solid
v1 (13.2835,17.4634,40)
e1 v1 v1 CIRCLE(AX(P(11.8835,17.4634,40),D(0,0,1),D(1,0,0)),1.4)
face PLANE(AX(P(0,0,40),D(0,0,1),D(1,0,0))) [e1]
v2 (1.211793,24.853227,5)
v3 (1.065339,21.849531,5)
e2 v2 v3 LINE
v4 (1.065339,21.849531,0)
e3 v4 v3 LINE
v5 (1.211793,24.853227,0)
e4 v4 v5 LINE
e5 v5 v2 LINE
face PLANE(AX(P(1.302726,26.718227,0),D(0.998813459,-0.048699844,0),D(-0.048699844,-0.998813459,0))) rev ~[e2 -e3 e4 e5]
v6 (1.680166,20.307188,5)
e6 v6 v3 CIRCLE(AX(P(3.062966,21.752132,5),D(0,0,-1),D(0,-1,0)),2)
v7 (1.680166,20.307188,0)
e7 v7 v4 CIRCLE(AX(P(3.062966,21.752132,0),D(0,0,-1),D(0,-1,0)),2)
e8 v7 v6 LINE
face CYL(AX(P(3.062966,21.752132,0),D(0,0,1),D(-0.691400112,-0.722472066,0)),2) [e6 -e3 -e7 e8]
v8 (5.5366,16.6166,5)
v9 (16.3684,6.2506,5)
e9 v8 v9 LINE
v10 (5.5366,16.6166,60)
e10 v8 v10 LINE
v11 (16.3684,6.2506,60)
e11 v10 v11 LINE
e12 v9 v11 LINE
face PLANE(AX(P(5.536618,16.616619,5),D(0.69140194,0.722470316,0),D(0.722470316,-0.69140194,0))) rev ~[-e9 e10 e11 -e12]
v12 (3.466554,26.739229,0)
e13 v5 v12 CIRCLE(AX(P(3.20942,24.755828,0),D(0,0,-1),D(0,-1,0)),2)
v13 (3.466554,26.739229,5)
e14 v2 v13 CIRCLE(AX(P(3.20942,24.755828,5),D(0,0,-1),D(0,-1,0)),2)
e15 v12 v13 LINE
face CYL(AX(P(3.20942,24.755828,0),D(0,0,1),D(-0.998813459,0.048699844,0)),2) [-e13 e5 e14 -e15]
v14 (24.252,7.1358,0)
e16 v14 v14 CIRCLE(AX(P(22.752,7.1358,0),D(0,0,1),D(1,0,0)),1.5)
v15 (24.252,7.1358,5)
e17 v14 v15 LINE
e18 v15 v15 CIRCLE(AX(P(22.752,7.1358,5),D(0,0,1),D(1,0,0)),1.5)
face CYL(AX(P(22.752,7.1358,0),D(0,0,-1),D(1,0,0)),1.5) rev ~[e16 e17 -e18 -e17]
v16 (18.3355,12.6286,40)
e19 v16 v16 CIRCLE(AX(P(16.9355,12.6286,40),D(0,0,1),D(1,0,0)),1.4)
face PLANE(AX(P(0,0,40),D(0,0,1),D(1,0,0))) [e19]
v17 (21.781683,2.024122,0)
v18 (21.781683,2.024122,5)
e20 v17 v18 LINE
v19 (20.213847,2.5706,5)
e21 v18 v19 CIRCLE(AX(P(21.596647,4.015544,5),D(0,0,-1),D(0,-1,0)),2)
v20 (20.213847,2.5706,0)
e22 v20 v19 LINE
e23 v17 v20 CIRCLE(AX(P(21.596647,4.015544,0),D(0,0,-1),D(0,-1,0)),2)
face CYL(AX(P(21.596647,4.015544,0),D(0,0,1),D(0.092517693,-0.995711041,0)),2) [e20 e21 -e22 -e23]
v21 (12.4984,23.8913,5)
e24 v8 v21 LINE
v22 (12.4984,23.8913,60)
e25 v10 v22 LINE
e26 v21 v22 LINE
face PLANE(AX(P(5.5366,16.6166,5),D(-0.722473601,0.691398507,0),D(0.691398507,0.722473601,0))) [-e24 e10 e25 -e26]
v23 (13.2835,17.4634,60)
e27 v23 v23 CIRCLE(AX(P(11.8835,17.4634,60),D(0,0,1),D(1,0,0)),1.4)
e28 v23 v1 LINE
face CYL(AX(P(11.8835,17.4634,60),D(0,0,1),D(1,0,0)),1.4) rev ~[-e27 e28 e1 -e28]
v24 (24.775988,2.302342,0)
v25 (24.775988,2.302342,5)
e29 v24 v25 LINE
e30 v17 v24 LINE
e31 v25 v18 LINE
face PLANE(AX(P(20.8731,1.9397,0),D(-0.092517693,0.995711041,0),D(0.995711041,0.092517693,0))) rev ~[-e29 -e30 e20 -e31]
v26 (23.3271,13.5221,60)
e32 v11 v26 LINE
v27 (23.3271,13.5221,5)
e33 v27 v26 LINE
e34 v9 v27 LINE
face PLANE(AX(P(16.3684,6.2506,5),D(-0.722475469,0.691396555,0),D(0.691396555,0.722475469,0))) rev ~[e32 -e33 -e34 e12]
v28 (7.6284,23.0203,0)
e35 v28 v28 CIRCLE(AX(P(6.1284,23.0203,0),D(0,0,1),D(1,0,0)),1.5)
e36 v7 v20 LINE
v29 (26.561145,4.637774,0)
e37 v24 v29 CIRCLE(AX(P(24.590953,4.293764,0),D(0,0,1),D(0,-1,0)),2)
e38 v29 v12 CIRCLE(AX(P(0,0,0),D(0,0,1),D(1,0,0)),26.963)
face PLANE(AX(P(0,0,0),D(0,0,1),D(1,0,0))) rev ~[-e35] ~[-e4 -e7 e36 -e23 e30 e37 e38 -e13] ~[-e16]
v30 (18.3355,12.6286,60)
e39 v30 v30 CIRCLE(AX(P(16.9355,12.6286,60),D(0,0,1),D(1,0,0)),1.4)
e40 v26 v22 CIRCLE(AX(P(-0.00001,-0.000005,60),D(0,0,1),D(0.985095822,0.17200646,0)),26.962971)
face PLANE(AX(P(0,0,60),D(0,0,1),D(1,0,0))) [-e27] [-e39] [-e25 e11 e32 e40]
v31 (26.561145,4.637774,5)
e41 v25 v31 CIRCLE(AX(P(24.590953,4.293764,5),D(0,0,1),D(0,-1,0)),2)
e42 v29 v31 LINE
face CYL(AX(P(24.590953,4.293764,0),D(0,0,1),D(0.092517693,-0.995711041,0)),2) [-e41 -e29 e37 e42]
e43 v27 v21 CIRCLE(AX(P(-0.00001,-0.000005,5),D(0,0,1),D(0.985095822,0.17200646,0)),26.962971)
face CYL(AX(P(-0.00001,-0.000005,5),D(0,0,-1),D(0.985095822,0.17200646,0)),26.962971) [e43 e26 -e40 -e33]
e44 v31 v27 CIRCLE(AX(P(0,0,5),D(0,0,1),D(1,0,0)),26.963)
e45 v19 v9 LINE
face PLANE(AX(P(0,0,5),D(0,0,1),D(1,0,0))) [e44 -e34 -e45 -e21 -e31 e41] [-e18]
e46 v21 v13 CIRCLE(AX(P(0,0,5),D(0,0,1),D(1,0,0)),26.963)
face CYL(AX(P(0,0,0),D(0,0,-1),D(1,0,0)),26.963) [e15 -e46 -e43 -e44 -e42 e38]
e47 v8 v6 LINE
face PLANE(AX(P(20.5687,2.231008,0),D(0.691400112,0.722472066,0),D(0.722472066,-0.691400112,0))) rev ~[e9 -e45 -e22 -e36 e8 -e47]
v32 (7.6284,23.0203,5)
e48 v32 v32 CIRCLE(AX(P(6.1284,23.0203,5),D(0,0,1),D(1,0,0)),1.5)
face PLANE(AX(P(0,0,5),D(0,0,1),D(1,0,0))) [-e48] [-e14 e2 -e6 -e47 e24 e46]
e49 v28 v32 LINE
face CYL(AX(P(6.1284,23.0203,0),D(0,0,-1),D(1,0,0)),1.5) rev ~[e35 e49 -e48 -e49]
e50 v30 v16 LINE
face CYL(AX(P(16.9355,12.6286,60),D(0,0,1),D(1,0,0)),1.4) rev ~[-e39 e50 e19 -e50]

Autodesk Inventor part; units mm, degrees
ref_plane "YZ Plane" through (0, 0, 0) normal (1, 0, 0) x (0, 1, 0)
ref_plane "XZ Plane" through (0, 0, 0) normal (0, 1, 0) x (-1, 0, 0)
ref_plane "XY Plane" through (0, 0, 0) normal (0, 0, 1) x (1, 0, 0)
ref_plane "Arbeitsebene1" through (0, 0, 0) normal (0, 0, 1) x (1, 0, 0)
sketch "Skizze1" plane through (0, 0, 0) normal (0, 0, 1) x (1, 0, 0)
  circle A0 centre (-8.37, 7.9978) radius 1.4 projected
  circle A1 centre (8.3745, -8.0022) radius 1.4 projected
  spline S0 degree 2 poles (24.1427, 2.2394) (24.731, 1.8489) (25.3785, 0.5587) (25.3785, -0.3311) knots 0 0 0 1 2 2 2 projected
  spline S1 degree 2 poles (25.3785, -0.3311) (25.3785, -1.1665) (24.7013, -2.5111) (24.1328, -2.8868) knots 0 0 0 1 2 2 2 projected
  spline S2 degree 2 poles (24.1328, -2.8868) (23.6682, -3.1784) (22.7141, -3.3761) (21.9726, -3.3761) knots 0 0 0 1 2 2 2 projected
  line L0 (21.9726, -3.3761) -> (20.5687, -3.3761) projected
  line L1 (20.5687, -3.3761) -> (20.5687, 2.7239) projected
  line L2 (20.5687, 2.7239) -> (21.9578, 2.7239) projected
  spline S3 degree 2 poles (21.9578, 2.7239) (22.8179, 2.7239) (23.7967, 2.4668) (24.1427, 2.2394) knots 0 0 0 1 2 2 2 projected
  spline S4 degree 2 poles (19.1896, -2.9312) (18.8979, -3.1982) (18.1564, -3.4849) (17.5978, -3.4849) knots 0 0 0 1 2 2 2 projected
  spline S5 degree 2 poles (17.5978, -3.4849) (16.9354, -3.4849) (16.0061, -3.2081) (15.5958, -3.0103) knots 0 0 0 1 2 2 2 projected
  line L3 (15.5958, -3.0103) -> (15.5958, -1.992) projected
  line L4 (15.5958, -1.992) -> (15.6551, -1.992) projected
  spline S6 degree 2 poles (15.6551, -1.992) (16.0555, -2.3677) (17.0689, -2.783) (17.5385, -2.783) knots 0 0 0 1 2 2 2 projected
  spline S7 degree 2 poles (17.5385, -2.783) (18.2108, -2.783) (18.8979, -2.2244) (18.8979, -1.7646) knots 0 0 0 1 2 2 2 projected
  spline S8 degree 2 poles (18.8979, -1.7646) (18.8979, -1.3988) (18.5371, -0.9441) (18.1465, -0.8304) knots 0 0 0 1 2 2 2 projected
  spline S9 degree 2 poles (18.1465, -0.8304) (17.8648, -0.7513) (17.3952, -0.6425) (17.0442, -0.5535) knots 0 0 0 1 2 2 2 projected
  spline S10 degree 2 poles (17.0442, -0.5535) (16.7278, -0.4695) (16.2285, -0.2174) (16.0358, -0.0147) knots 0 0 0 1 2 2 2 projected
  spline S11 degree 2 poles (16.0358, -0.0147) (15.8479, 0.188) (15.6403, 0.7317) (15.6403, 1.0876) knots 0 0 0 1 2 2 2 projected
  spline S12 degree 2 poles (15.6403, 1.0876) (15.6403, 1.8291) (16.797, 2.8326) (17.6918, 2.8326) knots 0 0 0 1 2 2 2 projected
  spline S13 degree 2 poles (17.6918, 2.8326) (18.2059, 2.8326) (19.1154, 2.6299) (19.5059, 2.4371) knots 0 0 0 1 2 2 2 projected
  line L5 (19.5059, 2.4371) -> (19.5059, 1.4683) projected
  line L6 (19.5059, 1.4683) -> (19.4466, 1.4683) projected
  spline S14 degree 2 poles (19.4466, 1.4683) (19.155, 1.7352) (18.2454, 2.1307) (17.7461, 2.1307) knots 0 0 0 1 2 2 2 projected
  spline S15 degree 2 poles (17.7461, 2.1307) (17.1826, 2.1307) (16.4856, 1.6017) (16.4856, 1.1717) knots 0 0 0 1 2 2 2 projected
  spline S16 degree 2 poles (16.4856, 1.1717) (16.4856, 0.7861) (16.8959, 0.3264) (17.2815, 0.2226) knots 0 0 0 1 2 2 2 projected
  spline S17 degree 2 poles (17.2815, 0.2226) (17.5385, 0.1534) (18.285, -0.0246) (18.5321, -0.0988) knots 0 0 0 1 2 2 2 projected
  spline S18 degree 2 poles (18.5321, -0.0988) (19.1599, -0.2915) (19.7432, -1.0676) (19.7432, -1.6361) knots 0 0 0 1 2 2 2 projected
  spline S19 degree 2 poles (19.7432, -1.6361) (19.7432, -1.997) (19.4516, -2.689) (19.1896, -2.9312) knots 0 0 0 1 2 2 2 projected
  line L7 (-17.7002, -6.4434) -> (-23.8502, -6.4434) projected
  arc A2 (-23.8502, -6.4434) -> (-24.8892, -7.3274) centre (-23.8502, -7.496) ccw projected
  arc A3 (-25.1732, 6.2825) -> (-24.1417, 5.4391) centre (-24.1417, 6.4917) ccw projected
  line L8 (-24.1417, 5.4391) -> (-17.7002, 5.4391) projected
  arc A4 (-15.7528, 3.4917) -> (-17.7002, 5.4391) centre (-17.7002, 3.4917) ccw projected
  line L9 (-15.7528, 3.4917) -> (-15.7528, -4.496) projected
  arc A5 (-17.7002, -6.4434) -> (-15.7528, -4.496) centre (-17.7002, -4.496) ccw projected
  circle A6 centre (-16.3217, -17.1216) radius 2.05 projected
  circle A7 centre (6.1284, 23.0203) radius 2.05 projected
  circle A8 centre (22.752, 7.1358) radius 2.05 projected
  circle A9 centre (-9.4998, -11.0022) radius 4 projected
  circle A10 centre (0.0001, -0.0022) radius 7.5 projected
  circle A11 centre (0, 0) radius 26.963
  circle A12 centre (0, 0) radius 20.963
  line L10 (1.3131, 26.931) -> (1.0209, 20.9381)
  line L11 (20.8731, 1.9397) -> (26.8473, 2.4948)
  circle A13 centre (6.1284, 23.0203) radius 1.5
  circle A14 centre (22.752, 7.1358) radius 1.5
  line L12 (1.0209, 20.9381) -> (20.8731, 1.9397)
  circle A15 centre (-13.4016, 13.4684) radius 4 projected
  circle A16 centre (13.3298, -13.5395) radius 4 projected
  line L13 (-25.1732, 9.0483) -> (-25.1732, 6.2825) projected
  line L14 (-24.8892, -7.3274) -> (-24.8892, -9.8026) projected
  arc A17 (-24.8892, -9.8026) -> (-25.1732, 9.0483) centre (0, 0) ccw projected
  point P0 (0, 0)
  point P1 (20.7853, 2.7239)
  point P2 (24.1373, 2.243)
  point P3 (20.5687, 2.2309)
  dimension "d1" = 6
  dimension "d2" = 5
  dimension "d3" = 5
  dimension "d6" = 3
  dimension "d7" = 3
extrude "Extrusion1" add sketch "Skizze1" along normal blind 5 contours L11 A12 L2 S3 | S3 L2 A12 L10 A17 L11 | L12 L1 L2 A12 | A17 L10 A11 L11 | L2 L1 L12 A12 | A7 | A8
fillet "Rundung1" radius 2 4 edges at (1.0209, 20.9381, 2.5) (1.3131, 26.931, 2.5) (20.8731, 1.9397, 2.5) (26.8473, 2.4948, 2.5)
sketch "Skizze2" plane through (0, 0, 5) normal (0, 0, 1) x (1, 0, 0)
  arc A0 (24.776, 2.3024) -> (26.5611, 4.6378) centre (24.5909, 4.2938) ccw projected
  arc A1 (26.5611, 4.6378) -> (3.4665, 26.7392) centre (0, 0) ccw projected
  arc A2 (3.4665, 26.7392) -> (1.2118, 24.8532) centre (3.2094, 24.7558) ccw projected
  line L0 (1.2118, 24.8532) -> (1.0653, 21.8495) projected
  arc A3 (1.0653, 21.8495) -> (1.6802, 20.3072) centre (3.063, 21.7521) ccw projected
  line L1 (1.6802, 20.3072) -> (20.2138, 2.5706) projected
  arc A4 (20.2138, 2.5706) -> (21.7817, 2.0241) centre (21.5966, 4.0155) ccw projected
  line L2 (21.7817, 2.0241) -> (24.776, 2.3024) projected
  circle A5 centre (6.1284, 23.0203) radius 1.5 projected
  circle A6 centre (22.752, 7.1358) radius 1.5 projected
  line L3 (1.6802, 20.3072) -> (20.2138, 2.5706) projected
  line L4 (5.5366, 16.6166) -> (12.4984, 23.8913)
  line L5 (16.3684, 6.2506) -> (23.3271, 13.5221)
  point P0 (0, 0)
  dimension "d9" = 4
  dimension "d10" = 4
extrude "Extrusion2" add sketch "Skizze2" along normal blind 55 contours L5 L1 L4 A1
sketch "Skizze3" plane through (0, 0, 60) normal (0, 0, 1) x (1, 0, 0)
  arc A0 (23.3271, 13.5221) -> (12.4984, 23.8913) centre (0, 0) ccw projected
  line L0 (12.4984, 23.8913) -> (5.5366, 16.6166) projected
  line L1 (5.5366, 16.6166) -> (16.3684, 6.2506) projected
  line L2 (16.3684, 6.2506) -> (23.3271, 13.5221) projected
  circle A1 centre (11.8835, 17.4634) radius 1.4
  circle A2 centre (16.9355, 12.6286) radius 1.4
  point P0 (0, 0)
  dimension "d13" = 2.8
  dimension "d14" = 2.8
  dimension "d15" = 4
  dimension "d16" = 4
  dimension "d17" = 5
  dimension "d18" = 5
extrude "Extrusion3" cut sketch "Skizze3" against normal blind 20 contours A1 | A2
properties part number "IM_Matchboxscope_Laserholder"
